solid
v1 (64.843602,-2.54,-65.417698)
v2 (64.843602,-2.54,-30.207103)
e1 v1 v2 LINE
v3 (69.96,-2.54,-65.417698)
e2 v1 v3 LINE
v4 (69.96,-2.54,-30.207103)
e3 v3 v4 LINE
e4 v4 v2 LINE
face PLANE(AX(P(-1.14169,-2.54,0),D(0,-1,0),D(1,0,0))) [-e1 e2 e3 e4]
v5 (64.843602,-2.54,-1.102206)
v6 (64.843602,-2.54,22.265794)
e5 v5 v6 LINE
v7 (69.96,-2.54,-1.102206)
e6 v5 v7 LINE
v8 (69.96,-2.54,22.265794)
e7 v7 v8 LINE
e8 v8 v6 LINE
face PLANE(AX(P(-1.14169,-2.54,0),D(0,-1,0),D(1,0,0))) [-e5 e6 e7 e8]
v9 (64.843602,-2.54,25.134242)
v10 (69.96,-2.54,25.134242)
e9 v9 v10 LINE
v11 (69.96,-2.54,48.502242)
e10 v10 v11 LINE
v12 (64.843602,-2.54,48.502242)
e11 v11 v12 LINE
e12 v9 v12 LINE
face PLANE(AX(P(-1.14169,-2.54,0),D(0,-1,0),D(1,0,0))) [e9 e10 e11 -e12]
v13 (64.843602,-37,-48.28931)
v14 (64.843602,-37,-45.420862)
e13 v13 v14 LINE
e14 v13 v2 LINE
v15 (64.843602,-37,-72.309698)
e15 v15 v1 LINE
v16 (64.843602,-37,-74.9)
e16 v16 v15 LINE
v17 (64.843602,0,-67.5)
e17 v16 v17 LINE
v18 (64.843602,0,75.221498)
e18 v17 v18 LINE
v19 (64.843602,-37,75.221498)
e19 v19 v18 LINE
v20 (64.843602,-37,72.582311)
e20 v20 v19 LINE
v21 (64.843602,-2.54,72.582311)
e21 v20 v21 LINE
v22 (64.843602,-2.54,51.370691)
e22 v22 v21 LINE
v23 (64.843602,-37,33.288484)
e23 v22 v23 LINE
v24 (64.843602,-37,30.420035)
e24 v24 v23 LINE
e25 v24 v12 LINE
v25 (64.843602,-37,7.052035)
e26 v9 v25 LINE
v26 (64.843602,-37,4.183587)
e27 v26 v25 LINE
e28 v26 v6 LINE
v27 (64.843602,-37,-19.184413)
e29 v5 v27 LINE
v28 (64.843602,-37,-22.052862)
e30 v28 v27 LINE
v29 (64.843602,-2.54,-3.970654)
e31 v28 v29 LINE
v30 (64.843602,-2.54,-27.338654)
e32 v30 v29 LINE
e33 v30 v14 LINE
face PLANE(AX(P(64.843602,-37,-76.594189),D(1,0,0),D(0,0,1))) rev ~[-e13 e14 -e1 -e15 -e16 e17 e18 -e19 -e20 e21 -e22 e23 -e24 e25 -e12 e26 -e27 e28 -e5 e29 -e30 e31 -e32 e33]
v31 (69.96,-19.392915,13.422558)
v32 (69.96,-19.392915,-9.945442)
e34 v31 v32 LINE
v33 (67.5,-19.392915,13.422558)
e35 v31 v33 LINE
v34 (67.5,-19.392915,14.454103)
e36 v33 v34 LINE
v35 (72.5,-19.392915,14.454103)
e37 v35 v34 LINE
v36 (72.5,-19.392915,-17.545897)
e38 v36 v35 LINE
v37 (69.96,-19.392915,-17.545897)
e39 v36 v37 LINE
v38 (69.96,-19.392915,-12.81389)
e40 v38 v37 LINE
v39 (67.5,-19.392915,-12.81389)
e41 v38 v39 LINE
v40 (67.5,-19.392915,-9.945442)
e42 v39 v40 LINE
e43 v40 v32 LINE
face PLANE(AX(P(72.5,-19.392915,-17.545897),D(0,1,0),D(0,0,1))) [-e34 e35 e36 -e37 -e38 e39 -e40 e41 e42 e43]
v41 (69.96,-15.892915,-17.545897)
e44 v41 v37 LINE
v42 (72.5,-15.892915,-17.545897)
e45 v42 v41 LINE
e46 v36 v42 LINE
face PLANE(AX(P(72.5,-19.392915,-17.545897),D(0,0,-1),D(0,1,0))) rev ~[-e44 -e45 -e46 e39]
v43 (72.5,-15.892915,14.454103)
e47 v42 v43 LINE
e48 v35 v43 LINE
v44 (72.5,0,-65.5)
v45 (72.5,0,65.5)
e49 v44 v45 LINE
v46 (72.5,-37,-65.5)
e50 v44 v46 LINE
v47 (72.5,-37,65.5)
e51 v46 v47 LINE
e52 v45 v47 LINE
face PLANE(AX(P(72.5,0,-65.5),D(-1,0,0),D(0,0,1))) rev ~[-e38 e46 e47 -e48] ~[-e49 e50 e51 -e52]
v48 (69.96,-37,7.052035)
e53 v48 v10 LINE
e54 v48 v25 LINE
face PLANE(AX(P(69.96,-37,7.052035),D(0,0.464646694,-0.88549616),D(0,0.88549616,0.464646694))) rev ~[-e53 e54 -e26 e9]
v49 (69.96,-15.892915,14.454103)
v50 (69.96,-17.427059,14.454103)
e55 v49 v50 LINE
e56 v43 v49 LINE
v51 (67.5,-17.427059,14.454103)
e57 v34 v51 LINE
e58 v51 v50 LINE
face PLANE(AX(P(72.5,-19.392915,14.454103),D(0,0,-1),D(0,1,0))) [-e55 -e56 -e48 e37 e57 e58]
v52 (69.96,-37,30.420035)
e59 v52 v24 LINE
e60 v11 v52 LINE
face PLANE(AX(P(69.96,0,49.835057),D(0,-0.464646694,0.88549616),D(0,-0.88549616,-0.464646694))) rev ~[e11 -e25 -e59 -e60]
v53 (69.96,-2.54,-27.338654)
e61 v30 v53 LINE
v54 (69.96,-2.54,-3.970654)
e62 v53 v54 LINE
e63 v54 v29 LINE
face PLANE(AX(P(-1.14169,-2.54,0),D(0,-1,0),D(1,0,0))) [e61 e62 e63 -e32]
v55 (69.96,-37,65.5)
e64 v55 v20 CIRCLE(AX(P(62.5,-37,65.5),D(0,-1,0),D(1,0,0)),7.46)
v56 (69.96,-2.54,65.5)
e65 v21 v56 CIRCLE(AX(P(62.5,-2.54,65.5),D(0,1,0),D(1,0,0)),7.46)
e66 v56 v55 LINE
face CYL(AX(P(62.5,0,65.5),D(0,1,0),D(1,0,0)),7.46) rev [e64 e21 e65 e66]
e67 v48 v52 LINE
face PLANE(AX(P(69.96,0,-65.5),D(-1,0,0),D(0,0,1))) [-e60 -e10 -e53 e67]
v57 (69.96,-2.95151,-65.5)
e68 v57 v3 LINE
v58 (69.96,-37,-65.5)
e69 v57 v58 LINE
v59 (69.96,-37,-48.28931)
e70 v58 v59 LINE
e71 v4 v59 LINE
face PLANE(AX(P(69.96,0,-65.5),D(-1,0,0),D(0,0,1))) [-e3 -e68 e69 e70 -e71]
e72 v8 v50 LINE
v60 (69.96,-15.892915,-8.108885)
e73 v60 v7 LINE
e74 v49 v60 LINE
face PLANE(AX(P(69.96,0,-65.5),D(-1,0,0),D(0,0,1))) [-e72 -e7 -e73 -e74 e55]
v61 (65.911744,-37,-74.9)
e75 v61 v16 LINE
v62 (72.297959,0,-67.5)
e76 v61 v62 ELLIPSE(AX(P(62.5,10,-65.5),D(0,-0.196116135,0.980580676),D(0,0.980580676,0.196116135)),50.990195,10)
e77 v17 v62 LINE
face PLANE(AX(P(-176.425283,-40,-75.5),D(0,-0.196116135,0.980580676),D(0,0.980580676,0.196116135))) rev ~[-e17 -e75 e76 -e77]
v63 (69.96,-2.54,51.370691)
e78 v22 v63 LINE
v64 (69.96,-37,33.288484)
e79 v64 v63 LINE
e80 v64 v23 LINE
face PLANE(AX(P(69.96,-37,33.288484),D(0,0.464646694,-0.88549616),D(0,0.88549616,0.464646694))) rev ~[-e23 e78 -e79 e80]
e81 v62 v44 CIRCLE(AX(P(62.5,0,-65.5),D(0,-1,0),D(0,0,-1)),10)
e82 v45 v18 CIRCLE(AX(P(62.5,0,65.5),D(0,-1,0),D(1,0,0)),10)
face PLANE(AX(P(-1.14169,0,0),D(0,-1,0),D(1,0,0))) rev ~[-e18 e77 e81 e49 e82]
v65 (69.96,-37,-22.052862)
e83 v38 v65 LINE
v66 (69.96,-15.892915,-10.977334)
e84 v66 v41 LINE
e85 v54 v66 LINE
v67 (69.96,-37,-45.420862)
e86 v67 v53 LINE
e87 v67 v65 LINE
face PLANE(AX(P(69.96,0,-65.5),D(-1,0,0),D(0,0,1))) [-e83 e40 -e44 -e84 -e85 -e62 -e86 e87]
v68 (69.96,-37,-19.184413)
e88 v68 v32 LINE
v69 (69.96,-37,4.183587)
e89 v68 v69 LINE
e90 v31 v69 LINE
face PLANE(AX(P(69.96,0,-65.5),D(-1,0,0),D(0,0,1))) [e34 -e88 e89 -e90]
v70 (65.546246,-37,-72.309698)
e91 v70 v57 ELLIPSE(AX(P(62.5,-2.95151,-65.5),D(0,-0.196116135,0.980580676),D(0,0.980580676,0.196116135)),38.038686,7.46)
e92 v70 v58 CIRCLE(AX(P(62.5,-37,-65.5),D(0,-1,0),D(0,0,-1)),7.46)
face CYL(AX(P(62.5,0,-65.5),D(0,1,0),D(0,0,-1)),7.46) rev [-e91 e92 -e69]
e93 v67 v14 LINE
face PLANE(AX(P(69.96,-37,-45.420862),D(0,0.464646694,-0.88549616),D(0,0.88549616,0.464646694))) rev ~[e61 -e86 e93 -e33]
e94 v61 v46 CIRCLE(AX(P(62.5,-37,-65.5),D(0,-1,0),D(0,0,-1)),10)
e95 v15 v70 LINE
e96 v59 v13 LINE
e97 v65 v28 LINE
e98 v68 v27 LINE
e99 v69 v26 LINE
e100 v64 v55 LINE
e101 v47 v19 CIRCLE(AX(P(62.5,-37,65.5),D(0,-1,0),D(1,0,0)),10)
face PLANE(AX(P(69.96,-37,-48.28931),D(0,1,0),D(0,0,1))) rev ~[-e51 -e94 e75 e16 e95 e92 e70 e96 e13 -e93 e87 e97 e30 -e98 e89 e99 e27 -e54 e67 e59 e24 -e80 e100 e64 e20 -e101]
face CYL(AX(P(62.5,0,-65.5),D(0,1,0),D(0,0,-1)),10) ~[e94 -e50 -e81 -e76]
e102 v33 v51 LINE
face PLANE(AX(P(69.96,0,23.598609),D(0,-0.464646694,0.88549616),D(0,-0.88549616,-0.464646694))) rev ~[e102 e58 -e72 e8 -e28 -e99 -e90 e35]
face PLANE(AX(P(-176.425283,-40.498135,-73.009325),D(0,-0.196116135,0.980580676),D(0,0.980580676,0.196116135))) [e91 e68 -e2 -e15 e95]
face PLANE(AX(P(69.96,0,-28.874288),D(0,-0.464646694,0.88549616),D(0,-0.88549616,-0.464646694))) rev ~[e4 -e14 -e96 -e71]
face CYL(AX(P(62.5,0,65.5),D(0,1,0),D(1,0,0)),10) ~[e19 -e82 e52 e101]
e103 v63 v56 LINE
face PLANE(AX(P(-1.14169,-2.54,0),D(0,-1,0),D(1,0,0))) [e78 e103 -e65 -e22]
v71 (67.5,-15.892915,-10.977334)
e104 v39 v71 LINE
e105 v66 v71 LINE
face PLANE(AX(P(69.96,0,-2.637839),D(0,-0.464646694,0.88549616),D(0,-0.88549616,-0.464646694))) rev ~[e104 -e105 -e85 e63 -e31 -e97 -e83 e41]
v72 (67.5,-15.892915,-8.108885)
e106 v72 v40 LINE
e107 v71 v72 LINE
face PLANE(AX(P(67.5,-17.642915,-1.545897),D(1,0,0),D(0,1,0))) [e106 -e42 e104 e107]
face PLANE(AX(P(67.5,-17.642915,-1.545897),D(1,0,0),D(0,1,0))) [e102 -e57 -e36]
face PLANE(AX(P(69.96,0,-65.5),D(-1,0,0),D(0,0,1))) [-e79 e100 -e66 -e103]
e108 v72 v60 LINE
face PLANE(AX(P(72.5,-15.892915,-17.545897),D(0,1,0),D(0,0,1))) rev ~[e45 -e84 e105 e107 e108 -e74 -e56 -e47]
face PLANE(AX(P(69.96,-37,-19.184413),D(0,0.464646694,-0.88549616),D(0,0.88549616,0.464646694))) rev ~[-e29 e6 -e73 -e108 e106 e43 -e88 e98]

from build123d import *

# Parameters (mm, degrees)
F1_DEPTH    = 37
F2_T1_DEPTH = 342.8505669038
F3_T        = -2.54
F4_W        = 125.55387271
F4_H        = 111.9176980871
F5_DEPTH    = 25.4
F6_R        = 3.175
F7_DEPTH    = 19.05
F9_DEPTH    = 142.24
F10_W       = 3.5
F10_H       = 32
F11_DEPTH   = 5
F12_W       = 142.5411626697
F12_H       = 154.7065079212
F13_DEPTH   = 37.001


# Not quite as in the source:
# - a fillet or chamfer that OpenCascade refuses, or shapes differently, is made with other operations: its cross-section is extruded or revolved along the edge and cut away or added


with BuildPart() as f1:
    # F0 (on Front) → F1 (new body)
    with BuildSketch(Plane.XZ):
        with BuildLine():
            Line((62.5, 75.5), (-72.5, 75.5))
            Line((-72.5, 75.5), (-72.5, -75.5))
            Line((-72.5, -75.5), (62.5, -75.5))
            ThreePointArc((62.5, -75.5), (69.5710678119, -72.5710678119), (72.5, -65.5))
            Line((72.5, -65.5), (72.5, 65.5))
            ThreePointArc((72.5, 65.5), (69.5710678119, 72.5710678119), (62.5, 75.5))
        make_face()
    extrude(amount=F1_DEPTH)

    # F2: chamfer of 40 x 8 on 1 edges, made by hand

    # F2_s2 → F2_t1 (cut)
    with BuildSketch(Plane.YZ.offset(-176.4252834519)):
        Polygon((-40, -75.5), (0, -67.5), (0, -75.5), align=None)
    extrude(amount=F2_T1_DEPTH, mode=Mode.SUBTRACT)

    # F3
    f3_openings = [f1.faces().sort_by_distance(p)[0] for p in [
        (-0.123954, -37, 0.284541),
    ]]
    offset(amount=F3_T, openings=f3_openings)

    # F4 (on face) → F5 (cut)
    with BuildSketch(Plane.XZ.offset(2.54)):
        with Locations((-0.276936355, 9.5411509565)):
            Rectangle(F4_W, F4_H)
    extrude(amount=-F5_DEPTH, mode=Mode.SUBTRACT)

    # F6 (on face) → F7 (cut)
    with BuildSketch(Plane(origin=(-72.5, 0, 0), x_dir=(0, -1, 0), z_dir=(-1, 0, 0))):
        with Locations((21.3561020792, 0)):
            Circle(F6_R)
        with Locations((21.3561020792, 35)):
            Circle(F6_R)
        with Locations((21.3561020792, -30)):
            Circle(F6_R)
    extrude(amount=-F7_DEPTH, mode=Mode.SUBTRACT)

    # F8 (on face) → F9 (join)
    with BuildSketch(Plane(origin=(69.96, 0, 0), x_dir=(0, -1, 0), z_dir=(-1, 0, 0))):
        Polygon((0, -28.8742875891), (37, -48.2893098931), (37, -45.4208615419), (0, -26.005839238), align=None)
        Polygon((0, -2.637839238), (37, -22.0528615419), (37, -19.1844131908), (0, 0.2306091132), align=None)
        Polygon((0, 23.5986091132), (37, 4.1835868092), (37, 7.0520351604), (0, 26.4670574643), align=None)
        Polygon((0, 49.8350574643), (37, 30.4200351604), (37, 33.2884835115), (0, 52.7035058155), align=None)
    extrude(amount=F9_DEPTH)

    # F10 (on face) → F11 (cut)
    with BuildSketch(Plane.YZ.offset(72.5)):
        with Locations((-17.6429149747, -1.5458973408)):
            Rectangle(F10_W, F10_H)
    extrude(amount=-F11_DEPTH, mode=Mode.SUBTRACT)

    # F12 (on face) → F13 (cut, through all)
    with BuildSketch(Plane.XZ.offset(37)):
        with Locations((-6.4269788563, 0.7590651512)):
            Rectangle(F12_W, F12_H)
    extrude(amount=-F13_DEPTH, mode=Mode.SUBTRACT)


solid = f1.part
